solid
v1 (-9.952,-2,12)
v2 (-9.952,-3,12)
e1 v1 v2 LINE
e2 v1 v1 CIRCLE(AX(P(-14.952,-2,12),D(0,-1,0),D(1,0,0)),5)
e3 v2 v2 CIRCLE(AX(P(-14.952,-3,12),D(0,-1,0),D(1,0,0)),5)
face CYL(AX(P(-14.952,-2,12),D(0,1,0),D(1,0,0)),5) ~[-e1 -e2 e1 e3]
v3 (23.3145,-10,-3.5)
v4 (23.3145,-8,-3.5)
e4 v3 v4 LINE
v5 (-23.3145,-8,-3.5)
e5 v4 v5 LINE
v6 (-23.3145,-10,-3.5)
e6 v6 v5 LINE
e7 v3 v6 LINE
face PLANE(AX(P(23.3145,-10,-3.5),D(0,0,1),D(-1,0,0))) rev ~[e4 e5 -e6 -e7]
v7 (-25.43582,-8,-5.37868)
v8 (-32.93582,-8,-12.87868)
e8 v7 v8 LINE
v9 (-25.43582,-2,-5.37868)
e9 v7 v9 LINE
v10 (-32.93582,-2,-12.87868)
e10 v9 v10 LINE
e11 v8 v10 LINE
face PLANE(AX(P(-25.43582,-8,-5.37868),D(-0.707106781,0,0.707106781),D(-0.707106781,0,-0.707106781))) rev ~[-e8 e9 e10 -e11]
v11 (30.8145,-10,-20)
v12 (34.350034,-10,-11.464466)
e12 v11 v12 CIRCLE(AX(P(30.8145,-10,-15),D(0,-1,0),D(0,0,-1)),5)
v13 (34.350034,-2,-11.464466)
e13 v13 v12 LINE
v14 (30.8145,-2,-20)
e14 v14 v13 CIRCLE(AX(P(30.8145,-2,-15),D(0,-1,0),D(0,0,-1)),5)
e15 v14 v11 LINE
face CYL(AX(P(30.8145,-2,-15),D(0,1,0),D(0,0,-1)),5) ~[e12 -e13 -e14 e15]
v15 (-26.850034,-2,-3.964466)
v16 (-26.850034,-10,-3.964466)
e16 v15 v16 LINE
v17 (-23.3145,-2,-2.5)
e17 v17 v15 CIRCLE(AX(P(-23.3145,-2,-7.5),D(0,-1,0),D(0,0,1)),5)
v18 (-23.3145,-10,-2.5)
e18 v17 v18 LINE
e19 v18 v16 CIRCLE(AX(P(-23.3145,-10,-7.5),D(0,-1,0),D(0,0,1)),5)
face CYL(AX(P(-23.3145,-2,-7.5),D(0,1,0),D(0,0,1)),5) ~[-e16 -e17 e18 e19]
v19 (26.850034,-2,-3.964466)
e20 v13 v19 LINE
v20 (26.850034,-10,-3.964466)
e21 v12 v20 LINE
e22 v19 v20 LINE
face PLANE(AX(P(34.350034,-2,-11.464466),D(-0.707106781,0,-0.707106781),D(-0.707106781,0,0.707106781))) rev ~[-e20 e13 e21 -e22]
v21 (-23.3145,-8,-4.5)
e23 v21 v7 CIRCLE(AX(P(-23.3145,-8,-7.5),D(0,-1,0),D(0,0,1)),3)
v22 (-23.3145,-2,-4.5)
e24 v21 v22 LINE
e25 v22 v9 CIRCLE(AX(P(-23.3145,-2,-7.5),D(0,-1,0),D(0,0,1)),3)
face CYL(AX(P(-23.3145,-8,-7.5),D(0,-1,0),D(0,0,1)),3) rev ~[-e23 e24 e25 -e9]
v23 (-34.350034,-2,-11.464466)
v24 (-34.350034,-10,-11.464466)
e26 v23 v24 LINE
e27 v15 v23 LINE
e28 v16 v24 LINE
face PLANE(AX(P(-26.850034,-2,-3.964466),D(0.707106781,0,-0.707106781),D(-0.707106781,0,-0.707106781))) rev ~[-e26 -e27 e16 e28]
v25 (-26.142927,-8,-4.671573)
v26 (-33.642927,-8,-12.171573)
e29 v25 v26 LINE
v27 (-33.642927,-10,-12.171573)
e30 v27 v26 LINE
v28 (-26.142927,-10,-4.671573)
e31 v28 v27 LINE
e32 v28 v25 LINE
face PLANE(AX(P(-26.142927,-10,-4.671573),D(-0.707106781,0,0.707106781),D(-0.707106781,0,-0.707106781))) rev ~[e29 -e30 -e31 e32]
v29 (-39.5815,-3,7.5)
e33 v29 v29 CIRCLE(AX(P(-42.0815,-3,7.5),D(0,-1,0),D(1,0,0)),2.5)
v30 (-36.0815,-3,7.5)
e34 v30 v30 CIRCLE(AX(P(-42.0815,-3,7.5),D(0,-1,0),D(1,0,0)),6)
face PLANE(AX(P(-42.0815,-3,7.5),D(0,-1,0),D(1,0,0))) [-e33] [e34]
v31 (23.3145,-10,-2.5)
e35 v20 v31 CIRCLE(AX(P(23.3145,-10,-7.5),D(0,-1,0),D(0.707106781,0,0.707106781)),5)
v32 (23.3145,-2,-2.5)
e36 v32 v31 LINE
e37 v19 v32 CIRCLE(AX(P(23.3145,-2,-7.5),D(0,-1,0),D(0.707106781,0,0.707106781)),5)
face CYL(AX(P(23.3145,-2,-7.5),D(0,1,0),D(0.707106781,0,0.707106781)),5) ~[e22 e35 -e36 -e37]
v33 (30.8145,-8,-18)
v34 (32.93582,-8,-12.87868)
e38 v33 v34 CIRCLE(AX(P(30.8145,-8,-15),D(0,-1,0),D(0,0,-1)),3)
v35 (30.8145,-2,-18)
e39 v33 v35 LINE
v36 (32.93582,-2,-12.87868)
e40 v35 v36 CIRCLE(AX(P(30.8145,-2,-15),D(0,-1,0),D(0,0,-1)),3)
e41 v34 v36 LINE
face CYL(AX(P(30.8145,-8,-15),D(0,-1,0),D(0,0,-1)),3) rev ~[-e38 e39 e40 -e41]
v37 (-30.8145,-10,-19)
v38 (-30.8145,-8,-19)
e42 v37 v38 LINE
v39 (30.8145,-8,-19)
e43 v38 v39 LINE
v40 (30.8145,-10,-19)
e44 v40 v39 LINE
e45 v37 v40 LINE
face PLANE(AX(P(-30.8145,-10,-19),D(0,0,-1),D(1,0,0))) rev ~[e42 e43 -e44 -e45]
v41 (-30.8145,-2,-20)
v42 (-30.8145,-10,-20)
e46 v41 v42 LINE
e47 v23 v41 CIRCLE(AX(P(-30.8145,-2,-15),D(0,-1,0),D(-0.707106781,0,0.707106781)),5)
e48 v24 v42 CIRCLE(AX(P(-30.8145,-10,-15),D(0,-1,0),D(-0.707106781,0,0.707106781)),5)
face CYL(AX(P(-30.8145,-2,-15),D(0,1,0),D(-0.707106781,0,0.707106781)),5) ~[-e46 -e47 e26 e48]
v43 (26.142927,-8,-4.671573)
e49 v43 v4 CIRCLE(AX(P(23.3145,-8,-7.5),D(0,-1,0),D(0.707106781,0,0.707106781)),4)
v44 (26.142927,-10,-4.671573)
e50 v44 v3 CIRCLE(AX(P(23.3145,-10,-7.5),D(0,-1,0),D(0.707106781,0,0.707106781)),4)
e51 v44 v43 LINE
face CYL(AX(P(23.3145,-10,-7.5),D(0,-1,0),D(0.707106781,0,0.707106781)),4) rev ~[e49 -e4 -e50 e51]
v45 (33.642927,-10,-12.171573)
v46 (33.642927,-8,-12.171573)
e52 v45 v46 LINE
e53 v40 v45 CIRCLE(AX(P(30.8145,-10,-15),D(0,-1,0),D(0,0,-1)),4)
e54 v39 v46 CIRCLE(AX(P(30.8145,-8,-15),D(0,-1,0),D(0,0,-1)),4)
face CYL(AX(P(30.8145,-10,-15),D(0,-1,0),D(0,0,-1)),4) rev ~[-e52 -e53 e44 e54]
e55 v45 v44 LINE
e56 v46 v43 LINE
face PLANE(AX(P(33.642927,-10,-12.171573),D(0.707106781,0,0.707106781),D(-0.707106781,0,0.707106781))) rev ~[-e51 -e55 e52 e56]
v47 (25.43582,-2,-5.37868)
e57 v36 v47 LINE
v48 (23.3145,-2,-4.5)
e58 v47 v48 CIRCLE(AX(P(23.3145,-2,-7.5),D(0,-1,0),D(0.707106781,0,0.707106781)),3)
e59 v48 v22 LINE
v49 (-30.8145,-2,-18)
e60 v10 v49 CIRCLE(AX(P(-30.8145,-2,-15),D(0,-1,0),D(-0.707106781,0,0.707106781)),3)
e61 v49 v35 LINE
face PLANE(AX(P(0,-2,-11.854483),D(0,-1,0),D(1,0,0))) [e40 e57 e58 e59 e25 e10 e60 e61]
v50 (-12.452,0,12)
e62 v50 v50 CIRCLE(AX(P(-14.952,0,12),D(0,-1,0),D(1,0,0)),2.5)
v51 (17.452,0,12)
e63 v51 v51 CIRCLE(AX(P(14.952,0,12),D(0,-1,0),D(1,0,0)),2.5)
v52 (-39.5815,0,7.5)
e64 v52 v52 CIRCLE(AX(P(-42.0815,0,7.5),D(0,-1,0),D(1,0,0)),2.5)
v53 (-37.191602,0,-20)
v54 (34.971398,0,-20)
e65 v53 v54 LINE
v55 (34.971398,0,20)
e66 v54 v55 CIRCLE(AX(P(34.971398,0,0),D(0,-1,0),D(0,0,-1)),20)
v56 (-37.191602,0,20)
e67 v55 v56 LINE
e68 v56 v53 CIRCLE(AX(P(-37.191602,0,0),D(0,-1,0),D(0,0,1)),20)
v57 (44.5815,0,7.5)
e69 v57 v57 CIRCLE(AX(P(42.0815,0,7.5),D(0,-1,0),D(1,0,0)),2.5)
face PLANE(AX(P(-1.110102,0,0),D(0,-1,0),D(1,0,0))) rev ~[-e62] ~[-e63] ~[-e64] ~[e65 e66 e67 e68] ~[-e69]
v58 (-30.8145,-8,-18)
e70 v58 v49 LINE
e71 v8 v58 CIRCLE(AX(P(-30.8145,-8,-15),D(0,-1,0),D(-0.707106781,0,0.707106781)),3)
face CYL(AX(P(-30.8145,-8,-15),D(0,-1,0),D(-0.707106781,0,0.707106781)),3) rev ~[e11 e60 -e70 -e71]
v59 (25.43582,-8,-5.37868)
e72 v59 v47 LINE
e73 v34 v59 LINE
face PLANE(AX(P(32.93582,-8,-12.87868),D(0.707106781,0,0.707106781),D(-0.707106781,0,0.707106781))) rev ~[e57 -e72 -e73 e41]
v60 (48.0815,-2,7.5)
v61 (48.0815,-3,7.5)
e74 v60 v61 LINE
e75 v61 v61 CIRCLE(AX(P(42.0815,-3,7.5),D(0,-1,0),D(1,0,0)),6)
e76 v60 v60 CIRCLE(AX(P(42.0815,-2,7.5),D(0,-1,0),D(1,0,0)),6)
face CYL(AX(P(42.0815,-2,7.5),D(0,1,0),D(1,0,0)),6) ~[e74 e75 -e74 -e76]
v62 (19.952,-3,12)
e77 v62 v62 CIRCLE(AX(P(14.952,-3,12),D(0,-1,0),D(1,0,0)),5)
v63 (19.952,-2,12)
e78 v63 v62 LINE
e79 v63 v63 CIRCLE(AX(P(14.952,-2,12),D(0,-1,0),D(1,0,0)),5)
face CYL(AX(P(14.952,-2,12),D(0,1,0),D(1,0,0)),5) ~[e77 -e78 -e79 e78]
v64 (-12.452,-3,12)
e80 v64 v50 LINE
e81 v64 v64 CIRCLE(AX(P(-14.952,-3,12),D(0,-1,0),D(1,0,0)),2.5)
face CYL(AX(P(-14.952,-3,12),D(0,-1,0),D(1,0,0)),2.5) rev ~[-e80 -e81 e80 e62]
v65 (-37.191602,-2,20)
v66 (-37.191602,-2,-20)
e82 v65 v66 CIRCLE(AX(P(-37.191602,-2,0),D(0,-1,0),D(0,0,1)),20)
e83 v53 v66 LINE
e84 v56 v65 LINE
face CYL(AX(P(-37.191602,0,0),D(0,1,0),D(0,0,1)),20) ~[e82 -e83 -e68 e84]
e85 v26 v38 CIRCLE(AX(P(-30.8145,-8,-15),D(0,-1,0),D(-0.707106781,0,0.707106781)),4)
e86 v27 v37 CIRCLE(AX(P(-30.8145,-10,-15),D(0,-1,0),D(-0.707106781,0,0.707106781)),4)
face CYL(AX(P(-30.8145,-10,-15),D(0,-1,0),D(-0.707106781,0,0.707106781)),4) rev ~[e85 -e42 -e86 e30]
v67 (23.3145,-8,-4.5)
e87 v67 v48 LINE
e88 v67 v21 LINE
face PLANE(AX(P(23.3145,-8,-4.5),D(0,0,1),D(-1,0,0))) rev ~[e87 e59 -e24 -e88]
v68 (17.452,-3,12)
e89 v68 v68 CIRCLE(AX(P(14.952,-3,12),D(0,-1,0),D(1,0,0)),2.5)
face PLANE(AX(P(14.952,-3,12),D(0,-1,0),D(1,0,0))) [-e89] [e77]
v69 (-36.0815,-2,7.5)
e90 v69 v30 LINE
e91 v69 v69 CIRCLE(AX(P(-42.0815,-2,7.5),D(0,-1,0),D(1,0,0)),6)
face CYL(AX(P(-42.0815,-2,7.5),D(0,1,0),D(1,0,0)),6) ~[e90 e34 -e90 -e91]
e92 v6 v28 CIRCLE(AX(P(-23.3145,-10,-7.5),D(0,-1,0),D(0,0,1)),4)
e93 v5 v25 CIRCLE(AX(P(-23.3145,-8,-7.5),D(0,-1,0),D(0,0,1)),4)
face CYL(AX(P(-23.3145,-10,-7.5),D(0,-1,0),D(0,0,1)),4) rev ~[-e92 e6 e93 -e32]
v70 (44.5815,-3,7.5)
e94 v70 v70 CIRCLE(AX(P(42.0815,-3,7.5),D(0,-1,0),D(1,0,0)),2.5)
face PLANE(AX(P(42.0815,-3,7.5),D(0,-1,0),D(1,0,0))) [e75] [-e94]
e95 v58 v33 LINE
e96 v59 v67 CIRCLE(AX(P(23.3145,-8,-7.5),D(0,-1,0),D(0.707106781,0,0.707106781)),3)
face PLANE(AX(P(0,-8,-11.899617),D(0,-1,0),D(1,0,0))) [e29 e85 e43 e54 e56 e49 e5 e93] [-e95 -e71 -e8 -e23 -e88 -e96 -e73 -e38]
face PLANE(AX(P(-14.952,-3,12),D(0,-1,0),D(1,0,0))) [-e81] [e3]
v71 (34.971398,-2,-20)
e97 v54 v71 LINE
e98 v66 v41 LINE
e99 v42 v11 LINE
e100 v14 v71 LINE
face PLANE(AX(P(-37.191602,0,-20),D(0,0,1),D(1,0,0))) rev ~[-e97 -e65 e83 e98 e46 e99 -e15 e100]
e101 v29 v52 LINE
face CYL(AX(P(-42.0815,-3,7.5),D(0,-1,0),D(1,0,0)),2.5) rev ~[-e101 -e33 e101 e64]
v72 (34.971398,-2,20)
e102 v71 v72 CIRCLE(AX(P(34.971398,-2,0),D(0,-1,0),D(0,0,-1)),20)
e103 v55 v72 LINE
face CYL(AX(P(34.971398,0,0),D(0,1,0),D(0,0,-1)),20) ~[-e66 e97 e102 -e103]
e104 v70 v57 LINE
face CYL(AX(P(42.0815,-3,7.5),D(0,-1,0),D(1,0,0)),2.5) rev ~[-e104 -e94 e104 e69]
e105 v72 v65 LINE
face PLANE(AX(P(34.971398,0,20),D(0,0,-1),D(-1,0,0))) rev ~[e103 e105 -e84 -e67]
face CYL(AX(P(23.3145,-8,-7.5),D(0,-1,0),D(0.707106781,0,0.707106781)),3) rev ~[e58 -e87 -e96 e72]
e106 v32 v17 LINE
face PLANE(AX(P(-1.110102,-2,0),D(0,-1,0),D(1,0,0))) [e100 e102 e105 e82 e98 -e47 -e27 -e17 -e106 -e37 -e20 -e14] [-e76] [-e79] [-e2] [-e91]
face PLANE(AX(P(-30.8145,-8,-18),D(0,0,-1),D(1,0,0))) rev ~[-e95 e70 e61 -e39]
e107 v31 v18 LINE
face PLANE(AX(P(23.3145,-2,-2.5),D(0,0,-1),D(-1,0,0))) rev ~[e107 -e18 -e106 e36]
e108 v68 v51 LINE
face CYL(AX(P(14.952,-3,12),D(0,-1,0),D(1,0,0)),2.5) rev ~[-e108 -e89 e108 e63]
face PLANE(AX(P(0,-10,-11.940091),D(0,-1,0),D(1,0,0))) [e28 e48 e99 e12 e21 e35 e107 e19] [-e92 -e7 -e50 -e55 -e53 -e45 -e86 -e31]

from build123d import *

# Parameters (mm, degrees)
F1_DEPTH  = 2
F3_DEPTH  = 8
F5_DEPTH  = 2
F7_DEPTH  = 6
F8_R      = 5
F8_R_2    = 6
F9_DEPTH  = 1
F10_R     = 2.5
F11_R     = 2.5
F12_DEPTH = 3.001


# Not quite as in the source:
# - a feature names something its author has since deleted; it is built from what else it names


with BuildPart() as f1:
    # F0 (on Front) → F1 (new body)
    with BuildSketch(Plane.XZ):
        with BuildLine():
            Line((-37.1916021632, -20), (34.9713978368, -20))
            ThreePointArc((34.9713978368, -20), (54.9713978368, 0), (34.9713978368, 20))
            Line((34.9713978368, 20), (-37.1916021632, 20))
            ThreePointArc((-37.1916021632, 20), (-57.1916021632, 0), (-37.1916021632, -20))
        make_face()
    extrude(amount=F1_DEPTH)

    # F2 (on face) → F3 (join)
    with BuildSketch(Plane.XZ.offset(2)):
        with BuildLine():
            Line((23.3145, -2.5), (0, -2.5))
            Line((0, -2.5), (-23.3145, -2.5))
            ThreePointArc((-23.3145, -2.5), (-25.2279171618, -2.8806023374), (-26.8500339059, -3.9644660941))
            Line((-26.8500339059, -3.9644660941), (-34.3500339059, -11.4644660941))
            ThreePointArc((-34.3500339059, -11.4644660941), (-35.4338976626, -16.9134171618), (-30.8145, -20))
            Line((-30.8145, -20), (0, -20))
            Line((0, -20), (30.8145, -20))
            ThreePointArc((30.8145, -20), (35.4338976626, -16.9134171618), (34.3500339059, -11.4644660941))
            Line((34.3500339059, -11.4644660941), (26.8500339059, -3.9644660941))
            ThreePointArc((26.8500339059, -3.9644660941), (25.2279171618, -2.8806023374), (23.3145, -2.5))
        make_face()
    extrude(amount=F3_DEPTH)

    # F4 (on face) → F5 (cut)
    with BuildSketch(Plane.XZ.offset(10)):
        with BuildLine():
            Line((-26.1429271247, -4.6715728753), (-33.6429271247, -12.1715728753))
            ThreePointArc((-33.6429271247, -12.1715728753), (-34.51001813, -16.5307337295), (-30.8145, -19))
            Line((-30.8145, -19), (30.8145, -19))
            ThreePointArc((30.8145, -19), (34.51001813, -16.5307337295), (33.6429271247, -12.1715728753))
            Line((33.6429271247, -12.1715728753), (26.1429271247, -4.6715728753))
            ThreePointArc((26.1429271247, -4.6715728753), (24.8452337295, -3.80448187), (23.3145, -3.5))
            Line((23.3145, -3.5), (-23.3145, -3.5))
            ThreePointArc((-23.3145, -3.5), (-24.8452337295, -3.80448187), (-26.1429271247, -4.6715728753))
        make_face()
    extrude(amount=-F5_DEPTH, mode=Mode.SUBTRACT)

    # F6 (on face) → F7 (cut)
    with BuildSketch(Plane.XZ.offset(8)):
        with BuildLine():
            ThreePointArc((30.8145, -18), (33.5861385975, -16.1480502971), (32.9358203436, -12.8786796564))
            Line((32.9358203436, -12.8786796564), (25.4358203436, -5.3786796564))
            ThreePointArc((25.4358203436, -5.3786796564), (24.4625502971, -4.7283614025), (23.3145, -4.5))
            Line((23.3145, -4.5), (-23.3145, -4.5))
            ThreePointArc((-23.3145, -4.5), (-24.4625502971, -4.7283614025), (-25.4358203436, -5.3786796564))
            Line((-25.4358203436, -5.3786796564), (-32.9358203436, -12.8786796564))
            ThreePointArc((-32.9358203436, -12.8786796564), (-33.5861385975, -16.1480502971), (-30.8145, -18))
            Line((-30.8145, -18), (30.8145, -18))
        make_face()
    extrude(amount=-F7_DEPTH, mode=Mode.SUBTRACT)

    # F8 (on face) → F9 (join)
    with BuildSketch(Plane.XZ.offset(2)):
        with Locations((-14.952, 12)):
            Circle(F8_R)
        with Locations((-42.0815, 7.5)):
            Circle(F8_R_2)
        with Locations((14.952, 12)):
            Circle(F8_R)
        with Locations((42.0815, 7.5)):
            Circle(F8_R_2)
    extrude(amount=F9_DEPTH)

    # F10 (on face) + F11 (on face) → F12 (cut, through all)
    with BuildSketch(Plane.XZ.offset(3)):
        with Locations((-14.952, 12)):
            Circle(F10_R)
        with Locations((14.952, 12)):
            Circle(F10_R)
    with BuildSketch(Plane.XZ.offset(3)):
        with Locations((-42.0815, 7.5)):
            Circle(F11_R)
        with Locations((42.0815, 7.5)):
            Circle(F11_R)
    extrude(amount=-F12_DEPTH, mode=Mode.SUBTRACT)


solid = f1.part
